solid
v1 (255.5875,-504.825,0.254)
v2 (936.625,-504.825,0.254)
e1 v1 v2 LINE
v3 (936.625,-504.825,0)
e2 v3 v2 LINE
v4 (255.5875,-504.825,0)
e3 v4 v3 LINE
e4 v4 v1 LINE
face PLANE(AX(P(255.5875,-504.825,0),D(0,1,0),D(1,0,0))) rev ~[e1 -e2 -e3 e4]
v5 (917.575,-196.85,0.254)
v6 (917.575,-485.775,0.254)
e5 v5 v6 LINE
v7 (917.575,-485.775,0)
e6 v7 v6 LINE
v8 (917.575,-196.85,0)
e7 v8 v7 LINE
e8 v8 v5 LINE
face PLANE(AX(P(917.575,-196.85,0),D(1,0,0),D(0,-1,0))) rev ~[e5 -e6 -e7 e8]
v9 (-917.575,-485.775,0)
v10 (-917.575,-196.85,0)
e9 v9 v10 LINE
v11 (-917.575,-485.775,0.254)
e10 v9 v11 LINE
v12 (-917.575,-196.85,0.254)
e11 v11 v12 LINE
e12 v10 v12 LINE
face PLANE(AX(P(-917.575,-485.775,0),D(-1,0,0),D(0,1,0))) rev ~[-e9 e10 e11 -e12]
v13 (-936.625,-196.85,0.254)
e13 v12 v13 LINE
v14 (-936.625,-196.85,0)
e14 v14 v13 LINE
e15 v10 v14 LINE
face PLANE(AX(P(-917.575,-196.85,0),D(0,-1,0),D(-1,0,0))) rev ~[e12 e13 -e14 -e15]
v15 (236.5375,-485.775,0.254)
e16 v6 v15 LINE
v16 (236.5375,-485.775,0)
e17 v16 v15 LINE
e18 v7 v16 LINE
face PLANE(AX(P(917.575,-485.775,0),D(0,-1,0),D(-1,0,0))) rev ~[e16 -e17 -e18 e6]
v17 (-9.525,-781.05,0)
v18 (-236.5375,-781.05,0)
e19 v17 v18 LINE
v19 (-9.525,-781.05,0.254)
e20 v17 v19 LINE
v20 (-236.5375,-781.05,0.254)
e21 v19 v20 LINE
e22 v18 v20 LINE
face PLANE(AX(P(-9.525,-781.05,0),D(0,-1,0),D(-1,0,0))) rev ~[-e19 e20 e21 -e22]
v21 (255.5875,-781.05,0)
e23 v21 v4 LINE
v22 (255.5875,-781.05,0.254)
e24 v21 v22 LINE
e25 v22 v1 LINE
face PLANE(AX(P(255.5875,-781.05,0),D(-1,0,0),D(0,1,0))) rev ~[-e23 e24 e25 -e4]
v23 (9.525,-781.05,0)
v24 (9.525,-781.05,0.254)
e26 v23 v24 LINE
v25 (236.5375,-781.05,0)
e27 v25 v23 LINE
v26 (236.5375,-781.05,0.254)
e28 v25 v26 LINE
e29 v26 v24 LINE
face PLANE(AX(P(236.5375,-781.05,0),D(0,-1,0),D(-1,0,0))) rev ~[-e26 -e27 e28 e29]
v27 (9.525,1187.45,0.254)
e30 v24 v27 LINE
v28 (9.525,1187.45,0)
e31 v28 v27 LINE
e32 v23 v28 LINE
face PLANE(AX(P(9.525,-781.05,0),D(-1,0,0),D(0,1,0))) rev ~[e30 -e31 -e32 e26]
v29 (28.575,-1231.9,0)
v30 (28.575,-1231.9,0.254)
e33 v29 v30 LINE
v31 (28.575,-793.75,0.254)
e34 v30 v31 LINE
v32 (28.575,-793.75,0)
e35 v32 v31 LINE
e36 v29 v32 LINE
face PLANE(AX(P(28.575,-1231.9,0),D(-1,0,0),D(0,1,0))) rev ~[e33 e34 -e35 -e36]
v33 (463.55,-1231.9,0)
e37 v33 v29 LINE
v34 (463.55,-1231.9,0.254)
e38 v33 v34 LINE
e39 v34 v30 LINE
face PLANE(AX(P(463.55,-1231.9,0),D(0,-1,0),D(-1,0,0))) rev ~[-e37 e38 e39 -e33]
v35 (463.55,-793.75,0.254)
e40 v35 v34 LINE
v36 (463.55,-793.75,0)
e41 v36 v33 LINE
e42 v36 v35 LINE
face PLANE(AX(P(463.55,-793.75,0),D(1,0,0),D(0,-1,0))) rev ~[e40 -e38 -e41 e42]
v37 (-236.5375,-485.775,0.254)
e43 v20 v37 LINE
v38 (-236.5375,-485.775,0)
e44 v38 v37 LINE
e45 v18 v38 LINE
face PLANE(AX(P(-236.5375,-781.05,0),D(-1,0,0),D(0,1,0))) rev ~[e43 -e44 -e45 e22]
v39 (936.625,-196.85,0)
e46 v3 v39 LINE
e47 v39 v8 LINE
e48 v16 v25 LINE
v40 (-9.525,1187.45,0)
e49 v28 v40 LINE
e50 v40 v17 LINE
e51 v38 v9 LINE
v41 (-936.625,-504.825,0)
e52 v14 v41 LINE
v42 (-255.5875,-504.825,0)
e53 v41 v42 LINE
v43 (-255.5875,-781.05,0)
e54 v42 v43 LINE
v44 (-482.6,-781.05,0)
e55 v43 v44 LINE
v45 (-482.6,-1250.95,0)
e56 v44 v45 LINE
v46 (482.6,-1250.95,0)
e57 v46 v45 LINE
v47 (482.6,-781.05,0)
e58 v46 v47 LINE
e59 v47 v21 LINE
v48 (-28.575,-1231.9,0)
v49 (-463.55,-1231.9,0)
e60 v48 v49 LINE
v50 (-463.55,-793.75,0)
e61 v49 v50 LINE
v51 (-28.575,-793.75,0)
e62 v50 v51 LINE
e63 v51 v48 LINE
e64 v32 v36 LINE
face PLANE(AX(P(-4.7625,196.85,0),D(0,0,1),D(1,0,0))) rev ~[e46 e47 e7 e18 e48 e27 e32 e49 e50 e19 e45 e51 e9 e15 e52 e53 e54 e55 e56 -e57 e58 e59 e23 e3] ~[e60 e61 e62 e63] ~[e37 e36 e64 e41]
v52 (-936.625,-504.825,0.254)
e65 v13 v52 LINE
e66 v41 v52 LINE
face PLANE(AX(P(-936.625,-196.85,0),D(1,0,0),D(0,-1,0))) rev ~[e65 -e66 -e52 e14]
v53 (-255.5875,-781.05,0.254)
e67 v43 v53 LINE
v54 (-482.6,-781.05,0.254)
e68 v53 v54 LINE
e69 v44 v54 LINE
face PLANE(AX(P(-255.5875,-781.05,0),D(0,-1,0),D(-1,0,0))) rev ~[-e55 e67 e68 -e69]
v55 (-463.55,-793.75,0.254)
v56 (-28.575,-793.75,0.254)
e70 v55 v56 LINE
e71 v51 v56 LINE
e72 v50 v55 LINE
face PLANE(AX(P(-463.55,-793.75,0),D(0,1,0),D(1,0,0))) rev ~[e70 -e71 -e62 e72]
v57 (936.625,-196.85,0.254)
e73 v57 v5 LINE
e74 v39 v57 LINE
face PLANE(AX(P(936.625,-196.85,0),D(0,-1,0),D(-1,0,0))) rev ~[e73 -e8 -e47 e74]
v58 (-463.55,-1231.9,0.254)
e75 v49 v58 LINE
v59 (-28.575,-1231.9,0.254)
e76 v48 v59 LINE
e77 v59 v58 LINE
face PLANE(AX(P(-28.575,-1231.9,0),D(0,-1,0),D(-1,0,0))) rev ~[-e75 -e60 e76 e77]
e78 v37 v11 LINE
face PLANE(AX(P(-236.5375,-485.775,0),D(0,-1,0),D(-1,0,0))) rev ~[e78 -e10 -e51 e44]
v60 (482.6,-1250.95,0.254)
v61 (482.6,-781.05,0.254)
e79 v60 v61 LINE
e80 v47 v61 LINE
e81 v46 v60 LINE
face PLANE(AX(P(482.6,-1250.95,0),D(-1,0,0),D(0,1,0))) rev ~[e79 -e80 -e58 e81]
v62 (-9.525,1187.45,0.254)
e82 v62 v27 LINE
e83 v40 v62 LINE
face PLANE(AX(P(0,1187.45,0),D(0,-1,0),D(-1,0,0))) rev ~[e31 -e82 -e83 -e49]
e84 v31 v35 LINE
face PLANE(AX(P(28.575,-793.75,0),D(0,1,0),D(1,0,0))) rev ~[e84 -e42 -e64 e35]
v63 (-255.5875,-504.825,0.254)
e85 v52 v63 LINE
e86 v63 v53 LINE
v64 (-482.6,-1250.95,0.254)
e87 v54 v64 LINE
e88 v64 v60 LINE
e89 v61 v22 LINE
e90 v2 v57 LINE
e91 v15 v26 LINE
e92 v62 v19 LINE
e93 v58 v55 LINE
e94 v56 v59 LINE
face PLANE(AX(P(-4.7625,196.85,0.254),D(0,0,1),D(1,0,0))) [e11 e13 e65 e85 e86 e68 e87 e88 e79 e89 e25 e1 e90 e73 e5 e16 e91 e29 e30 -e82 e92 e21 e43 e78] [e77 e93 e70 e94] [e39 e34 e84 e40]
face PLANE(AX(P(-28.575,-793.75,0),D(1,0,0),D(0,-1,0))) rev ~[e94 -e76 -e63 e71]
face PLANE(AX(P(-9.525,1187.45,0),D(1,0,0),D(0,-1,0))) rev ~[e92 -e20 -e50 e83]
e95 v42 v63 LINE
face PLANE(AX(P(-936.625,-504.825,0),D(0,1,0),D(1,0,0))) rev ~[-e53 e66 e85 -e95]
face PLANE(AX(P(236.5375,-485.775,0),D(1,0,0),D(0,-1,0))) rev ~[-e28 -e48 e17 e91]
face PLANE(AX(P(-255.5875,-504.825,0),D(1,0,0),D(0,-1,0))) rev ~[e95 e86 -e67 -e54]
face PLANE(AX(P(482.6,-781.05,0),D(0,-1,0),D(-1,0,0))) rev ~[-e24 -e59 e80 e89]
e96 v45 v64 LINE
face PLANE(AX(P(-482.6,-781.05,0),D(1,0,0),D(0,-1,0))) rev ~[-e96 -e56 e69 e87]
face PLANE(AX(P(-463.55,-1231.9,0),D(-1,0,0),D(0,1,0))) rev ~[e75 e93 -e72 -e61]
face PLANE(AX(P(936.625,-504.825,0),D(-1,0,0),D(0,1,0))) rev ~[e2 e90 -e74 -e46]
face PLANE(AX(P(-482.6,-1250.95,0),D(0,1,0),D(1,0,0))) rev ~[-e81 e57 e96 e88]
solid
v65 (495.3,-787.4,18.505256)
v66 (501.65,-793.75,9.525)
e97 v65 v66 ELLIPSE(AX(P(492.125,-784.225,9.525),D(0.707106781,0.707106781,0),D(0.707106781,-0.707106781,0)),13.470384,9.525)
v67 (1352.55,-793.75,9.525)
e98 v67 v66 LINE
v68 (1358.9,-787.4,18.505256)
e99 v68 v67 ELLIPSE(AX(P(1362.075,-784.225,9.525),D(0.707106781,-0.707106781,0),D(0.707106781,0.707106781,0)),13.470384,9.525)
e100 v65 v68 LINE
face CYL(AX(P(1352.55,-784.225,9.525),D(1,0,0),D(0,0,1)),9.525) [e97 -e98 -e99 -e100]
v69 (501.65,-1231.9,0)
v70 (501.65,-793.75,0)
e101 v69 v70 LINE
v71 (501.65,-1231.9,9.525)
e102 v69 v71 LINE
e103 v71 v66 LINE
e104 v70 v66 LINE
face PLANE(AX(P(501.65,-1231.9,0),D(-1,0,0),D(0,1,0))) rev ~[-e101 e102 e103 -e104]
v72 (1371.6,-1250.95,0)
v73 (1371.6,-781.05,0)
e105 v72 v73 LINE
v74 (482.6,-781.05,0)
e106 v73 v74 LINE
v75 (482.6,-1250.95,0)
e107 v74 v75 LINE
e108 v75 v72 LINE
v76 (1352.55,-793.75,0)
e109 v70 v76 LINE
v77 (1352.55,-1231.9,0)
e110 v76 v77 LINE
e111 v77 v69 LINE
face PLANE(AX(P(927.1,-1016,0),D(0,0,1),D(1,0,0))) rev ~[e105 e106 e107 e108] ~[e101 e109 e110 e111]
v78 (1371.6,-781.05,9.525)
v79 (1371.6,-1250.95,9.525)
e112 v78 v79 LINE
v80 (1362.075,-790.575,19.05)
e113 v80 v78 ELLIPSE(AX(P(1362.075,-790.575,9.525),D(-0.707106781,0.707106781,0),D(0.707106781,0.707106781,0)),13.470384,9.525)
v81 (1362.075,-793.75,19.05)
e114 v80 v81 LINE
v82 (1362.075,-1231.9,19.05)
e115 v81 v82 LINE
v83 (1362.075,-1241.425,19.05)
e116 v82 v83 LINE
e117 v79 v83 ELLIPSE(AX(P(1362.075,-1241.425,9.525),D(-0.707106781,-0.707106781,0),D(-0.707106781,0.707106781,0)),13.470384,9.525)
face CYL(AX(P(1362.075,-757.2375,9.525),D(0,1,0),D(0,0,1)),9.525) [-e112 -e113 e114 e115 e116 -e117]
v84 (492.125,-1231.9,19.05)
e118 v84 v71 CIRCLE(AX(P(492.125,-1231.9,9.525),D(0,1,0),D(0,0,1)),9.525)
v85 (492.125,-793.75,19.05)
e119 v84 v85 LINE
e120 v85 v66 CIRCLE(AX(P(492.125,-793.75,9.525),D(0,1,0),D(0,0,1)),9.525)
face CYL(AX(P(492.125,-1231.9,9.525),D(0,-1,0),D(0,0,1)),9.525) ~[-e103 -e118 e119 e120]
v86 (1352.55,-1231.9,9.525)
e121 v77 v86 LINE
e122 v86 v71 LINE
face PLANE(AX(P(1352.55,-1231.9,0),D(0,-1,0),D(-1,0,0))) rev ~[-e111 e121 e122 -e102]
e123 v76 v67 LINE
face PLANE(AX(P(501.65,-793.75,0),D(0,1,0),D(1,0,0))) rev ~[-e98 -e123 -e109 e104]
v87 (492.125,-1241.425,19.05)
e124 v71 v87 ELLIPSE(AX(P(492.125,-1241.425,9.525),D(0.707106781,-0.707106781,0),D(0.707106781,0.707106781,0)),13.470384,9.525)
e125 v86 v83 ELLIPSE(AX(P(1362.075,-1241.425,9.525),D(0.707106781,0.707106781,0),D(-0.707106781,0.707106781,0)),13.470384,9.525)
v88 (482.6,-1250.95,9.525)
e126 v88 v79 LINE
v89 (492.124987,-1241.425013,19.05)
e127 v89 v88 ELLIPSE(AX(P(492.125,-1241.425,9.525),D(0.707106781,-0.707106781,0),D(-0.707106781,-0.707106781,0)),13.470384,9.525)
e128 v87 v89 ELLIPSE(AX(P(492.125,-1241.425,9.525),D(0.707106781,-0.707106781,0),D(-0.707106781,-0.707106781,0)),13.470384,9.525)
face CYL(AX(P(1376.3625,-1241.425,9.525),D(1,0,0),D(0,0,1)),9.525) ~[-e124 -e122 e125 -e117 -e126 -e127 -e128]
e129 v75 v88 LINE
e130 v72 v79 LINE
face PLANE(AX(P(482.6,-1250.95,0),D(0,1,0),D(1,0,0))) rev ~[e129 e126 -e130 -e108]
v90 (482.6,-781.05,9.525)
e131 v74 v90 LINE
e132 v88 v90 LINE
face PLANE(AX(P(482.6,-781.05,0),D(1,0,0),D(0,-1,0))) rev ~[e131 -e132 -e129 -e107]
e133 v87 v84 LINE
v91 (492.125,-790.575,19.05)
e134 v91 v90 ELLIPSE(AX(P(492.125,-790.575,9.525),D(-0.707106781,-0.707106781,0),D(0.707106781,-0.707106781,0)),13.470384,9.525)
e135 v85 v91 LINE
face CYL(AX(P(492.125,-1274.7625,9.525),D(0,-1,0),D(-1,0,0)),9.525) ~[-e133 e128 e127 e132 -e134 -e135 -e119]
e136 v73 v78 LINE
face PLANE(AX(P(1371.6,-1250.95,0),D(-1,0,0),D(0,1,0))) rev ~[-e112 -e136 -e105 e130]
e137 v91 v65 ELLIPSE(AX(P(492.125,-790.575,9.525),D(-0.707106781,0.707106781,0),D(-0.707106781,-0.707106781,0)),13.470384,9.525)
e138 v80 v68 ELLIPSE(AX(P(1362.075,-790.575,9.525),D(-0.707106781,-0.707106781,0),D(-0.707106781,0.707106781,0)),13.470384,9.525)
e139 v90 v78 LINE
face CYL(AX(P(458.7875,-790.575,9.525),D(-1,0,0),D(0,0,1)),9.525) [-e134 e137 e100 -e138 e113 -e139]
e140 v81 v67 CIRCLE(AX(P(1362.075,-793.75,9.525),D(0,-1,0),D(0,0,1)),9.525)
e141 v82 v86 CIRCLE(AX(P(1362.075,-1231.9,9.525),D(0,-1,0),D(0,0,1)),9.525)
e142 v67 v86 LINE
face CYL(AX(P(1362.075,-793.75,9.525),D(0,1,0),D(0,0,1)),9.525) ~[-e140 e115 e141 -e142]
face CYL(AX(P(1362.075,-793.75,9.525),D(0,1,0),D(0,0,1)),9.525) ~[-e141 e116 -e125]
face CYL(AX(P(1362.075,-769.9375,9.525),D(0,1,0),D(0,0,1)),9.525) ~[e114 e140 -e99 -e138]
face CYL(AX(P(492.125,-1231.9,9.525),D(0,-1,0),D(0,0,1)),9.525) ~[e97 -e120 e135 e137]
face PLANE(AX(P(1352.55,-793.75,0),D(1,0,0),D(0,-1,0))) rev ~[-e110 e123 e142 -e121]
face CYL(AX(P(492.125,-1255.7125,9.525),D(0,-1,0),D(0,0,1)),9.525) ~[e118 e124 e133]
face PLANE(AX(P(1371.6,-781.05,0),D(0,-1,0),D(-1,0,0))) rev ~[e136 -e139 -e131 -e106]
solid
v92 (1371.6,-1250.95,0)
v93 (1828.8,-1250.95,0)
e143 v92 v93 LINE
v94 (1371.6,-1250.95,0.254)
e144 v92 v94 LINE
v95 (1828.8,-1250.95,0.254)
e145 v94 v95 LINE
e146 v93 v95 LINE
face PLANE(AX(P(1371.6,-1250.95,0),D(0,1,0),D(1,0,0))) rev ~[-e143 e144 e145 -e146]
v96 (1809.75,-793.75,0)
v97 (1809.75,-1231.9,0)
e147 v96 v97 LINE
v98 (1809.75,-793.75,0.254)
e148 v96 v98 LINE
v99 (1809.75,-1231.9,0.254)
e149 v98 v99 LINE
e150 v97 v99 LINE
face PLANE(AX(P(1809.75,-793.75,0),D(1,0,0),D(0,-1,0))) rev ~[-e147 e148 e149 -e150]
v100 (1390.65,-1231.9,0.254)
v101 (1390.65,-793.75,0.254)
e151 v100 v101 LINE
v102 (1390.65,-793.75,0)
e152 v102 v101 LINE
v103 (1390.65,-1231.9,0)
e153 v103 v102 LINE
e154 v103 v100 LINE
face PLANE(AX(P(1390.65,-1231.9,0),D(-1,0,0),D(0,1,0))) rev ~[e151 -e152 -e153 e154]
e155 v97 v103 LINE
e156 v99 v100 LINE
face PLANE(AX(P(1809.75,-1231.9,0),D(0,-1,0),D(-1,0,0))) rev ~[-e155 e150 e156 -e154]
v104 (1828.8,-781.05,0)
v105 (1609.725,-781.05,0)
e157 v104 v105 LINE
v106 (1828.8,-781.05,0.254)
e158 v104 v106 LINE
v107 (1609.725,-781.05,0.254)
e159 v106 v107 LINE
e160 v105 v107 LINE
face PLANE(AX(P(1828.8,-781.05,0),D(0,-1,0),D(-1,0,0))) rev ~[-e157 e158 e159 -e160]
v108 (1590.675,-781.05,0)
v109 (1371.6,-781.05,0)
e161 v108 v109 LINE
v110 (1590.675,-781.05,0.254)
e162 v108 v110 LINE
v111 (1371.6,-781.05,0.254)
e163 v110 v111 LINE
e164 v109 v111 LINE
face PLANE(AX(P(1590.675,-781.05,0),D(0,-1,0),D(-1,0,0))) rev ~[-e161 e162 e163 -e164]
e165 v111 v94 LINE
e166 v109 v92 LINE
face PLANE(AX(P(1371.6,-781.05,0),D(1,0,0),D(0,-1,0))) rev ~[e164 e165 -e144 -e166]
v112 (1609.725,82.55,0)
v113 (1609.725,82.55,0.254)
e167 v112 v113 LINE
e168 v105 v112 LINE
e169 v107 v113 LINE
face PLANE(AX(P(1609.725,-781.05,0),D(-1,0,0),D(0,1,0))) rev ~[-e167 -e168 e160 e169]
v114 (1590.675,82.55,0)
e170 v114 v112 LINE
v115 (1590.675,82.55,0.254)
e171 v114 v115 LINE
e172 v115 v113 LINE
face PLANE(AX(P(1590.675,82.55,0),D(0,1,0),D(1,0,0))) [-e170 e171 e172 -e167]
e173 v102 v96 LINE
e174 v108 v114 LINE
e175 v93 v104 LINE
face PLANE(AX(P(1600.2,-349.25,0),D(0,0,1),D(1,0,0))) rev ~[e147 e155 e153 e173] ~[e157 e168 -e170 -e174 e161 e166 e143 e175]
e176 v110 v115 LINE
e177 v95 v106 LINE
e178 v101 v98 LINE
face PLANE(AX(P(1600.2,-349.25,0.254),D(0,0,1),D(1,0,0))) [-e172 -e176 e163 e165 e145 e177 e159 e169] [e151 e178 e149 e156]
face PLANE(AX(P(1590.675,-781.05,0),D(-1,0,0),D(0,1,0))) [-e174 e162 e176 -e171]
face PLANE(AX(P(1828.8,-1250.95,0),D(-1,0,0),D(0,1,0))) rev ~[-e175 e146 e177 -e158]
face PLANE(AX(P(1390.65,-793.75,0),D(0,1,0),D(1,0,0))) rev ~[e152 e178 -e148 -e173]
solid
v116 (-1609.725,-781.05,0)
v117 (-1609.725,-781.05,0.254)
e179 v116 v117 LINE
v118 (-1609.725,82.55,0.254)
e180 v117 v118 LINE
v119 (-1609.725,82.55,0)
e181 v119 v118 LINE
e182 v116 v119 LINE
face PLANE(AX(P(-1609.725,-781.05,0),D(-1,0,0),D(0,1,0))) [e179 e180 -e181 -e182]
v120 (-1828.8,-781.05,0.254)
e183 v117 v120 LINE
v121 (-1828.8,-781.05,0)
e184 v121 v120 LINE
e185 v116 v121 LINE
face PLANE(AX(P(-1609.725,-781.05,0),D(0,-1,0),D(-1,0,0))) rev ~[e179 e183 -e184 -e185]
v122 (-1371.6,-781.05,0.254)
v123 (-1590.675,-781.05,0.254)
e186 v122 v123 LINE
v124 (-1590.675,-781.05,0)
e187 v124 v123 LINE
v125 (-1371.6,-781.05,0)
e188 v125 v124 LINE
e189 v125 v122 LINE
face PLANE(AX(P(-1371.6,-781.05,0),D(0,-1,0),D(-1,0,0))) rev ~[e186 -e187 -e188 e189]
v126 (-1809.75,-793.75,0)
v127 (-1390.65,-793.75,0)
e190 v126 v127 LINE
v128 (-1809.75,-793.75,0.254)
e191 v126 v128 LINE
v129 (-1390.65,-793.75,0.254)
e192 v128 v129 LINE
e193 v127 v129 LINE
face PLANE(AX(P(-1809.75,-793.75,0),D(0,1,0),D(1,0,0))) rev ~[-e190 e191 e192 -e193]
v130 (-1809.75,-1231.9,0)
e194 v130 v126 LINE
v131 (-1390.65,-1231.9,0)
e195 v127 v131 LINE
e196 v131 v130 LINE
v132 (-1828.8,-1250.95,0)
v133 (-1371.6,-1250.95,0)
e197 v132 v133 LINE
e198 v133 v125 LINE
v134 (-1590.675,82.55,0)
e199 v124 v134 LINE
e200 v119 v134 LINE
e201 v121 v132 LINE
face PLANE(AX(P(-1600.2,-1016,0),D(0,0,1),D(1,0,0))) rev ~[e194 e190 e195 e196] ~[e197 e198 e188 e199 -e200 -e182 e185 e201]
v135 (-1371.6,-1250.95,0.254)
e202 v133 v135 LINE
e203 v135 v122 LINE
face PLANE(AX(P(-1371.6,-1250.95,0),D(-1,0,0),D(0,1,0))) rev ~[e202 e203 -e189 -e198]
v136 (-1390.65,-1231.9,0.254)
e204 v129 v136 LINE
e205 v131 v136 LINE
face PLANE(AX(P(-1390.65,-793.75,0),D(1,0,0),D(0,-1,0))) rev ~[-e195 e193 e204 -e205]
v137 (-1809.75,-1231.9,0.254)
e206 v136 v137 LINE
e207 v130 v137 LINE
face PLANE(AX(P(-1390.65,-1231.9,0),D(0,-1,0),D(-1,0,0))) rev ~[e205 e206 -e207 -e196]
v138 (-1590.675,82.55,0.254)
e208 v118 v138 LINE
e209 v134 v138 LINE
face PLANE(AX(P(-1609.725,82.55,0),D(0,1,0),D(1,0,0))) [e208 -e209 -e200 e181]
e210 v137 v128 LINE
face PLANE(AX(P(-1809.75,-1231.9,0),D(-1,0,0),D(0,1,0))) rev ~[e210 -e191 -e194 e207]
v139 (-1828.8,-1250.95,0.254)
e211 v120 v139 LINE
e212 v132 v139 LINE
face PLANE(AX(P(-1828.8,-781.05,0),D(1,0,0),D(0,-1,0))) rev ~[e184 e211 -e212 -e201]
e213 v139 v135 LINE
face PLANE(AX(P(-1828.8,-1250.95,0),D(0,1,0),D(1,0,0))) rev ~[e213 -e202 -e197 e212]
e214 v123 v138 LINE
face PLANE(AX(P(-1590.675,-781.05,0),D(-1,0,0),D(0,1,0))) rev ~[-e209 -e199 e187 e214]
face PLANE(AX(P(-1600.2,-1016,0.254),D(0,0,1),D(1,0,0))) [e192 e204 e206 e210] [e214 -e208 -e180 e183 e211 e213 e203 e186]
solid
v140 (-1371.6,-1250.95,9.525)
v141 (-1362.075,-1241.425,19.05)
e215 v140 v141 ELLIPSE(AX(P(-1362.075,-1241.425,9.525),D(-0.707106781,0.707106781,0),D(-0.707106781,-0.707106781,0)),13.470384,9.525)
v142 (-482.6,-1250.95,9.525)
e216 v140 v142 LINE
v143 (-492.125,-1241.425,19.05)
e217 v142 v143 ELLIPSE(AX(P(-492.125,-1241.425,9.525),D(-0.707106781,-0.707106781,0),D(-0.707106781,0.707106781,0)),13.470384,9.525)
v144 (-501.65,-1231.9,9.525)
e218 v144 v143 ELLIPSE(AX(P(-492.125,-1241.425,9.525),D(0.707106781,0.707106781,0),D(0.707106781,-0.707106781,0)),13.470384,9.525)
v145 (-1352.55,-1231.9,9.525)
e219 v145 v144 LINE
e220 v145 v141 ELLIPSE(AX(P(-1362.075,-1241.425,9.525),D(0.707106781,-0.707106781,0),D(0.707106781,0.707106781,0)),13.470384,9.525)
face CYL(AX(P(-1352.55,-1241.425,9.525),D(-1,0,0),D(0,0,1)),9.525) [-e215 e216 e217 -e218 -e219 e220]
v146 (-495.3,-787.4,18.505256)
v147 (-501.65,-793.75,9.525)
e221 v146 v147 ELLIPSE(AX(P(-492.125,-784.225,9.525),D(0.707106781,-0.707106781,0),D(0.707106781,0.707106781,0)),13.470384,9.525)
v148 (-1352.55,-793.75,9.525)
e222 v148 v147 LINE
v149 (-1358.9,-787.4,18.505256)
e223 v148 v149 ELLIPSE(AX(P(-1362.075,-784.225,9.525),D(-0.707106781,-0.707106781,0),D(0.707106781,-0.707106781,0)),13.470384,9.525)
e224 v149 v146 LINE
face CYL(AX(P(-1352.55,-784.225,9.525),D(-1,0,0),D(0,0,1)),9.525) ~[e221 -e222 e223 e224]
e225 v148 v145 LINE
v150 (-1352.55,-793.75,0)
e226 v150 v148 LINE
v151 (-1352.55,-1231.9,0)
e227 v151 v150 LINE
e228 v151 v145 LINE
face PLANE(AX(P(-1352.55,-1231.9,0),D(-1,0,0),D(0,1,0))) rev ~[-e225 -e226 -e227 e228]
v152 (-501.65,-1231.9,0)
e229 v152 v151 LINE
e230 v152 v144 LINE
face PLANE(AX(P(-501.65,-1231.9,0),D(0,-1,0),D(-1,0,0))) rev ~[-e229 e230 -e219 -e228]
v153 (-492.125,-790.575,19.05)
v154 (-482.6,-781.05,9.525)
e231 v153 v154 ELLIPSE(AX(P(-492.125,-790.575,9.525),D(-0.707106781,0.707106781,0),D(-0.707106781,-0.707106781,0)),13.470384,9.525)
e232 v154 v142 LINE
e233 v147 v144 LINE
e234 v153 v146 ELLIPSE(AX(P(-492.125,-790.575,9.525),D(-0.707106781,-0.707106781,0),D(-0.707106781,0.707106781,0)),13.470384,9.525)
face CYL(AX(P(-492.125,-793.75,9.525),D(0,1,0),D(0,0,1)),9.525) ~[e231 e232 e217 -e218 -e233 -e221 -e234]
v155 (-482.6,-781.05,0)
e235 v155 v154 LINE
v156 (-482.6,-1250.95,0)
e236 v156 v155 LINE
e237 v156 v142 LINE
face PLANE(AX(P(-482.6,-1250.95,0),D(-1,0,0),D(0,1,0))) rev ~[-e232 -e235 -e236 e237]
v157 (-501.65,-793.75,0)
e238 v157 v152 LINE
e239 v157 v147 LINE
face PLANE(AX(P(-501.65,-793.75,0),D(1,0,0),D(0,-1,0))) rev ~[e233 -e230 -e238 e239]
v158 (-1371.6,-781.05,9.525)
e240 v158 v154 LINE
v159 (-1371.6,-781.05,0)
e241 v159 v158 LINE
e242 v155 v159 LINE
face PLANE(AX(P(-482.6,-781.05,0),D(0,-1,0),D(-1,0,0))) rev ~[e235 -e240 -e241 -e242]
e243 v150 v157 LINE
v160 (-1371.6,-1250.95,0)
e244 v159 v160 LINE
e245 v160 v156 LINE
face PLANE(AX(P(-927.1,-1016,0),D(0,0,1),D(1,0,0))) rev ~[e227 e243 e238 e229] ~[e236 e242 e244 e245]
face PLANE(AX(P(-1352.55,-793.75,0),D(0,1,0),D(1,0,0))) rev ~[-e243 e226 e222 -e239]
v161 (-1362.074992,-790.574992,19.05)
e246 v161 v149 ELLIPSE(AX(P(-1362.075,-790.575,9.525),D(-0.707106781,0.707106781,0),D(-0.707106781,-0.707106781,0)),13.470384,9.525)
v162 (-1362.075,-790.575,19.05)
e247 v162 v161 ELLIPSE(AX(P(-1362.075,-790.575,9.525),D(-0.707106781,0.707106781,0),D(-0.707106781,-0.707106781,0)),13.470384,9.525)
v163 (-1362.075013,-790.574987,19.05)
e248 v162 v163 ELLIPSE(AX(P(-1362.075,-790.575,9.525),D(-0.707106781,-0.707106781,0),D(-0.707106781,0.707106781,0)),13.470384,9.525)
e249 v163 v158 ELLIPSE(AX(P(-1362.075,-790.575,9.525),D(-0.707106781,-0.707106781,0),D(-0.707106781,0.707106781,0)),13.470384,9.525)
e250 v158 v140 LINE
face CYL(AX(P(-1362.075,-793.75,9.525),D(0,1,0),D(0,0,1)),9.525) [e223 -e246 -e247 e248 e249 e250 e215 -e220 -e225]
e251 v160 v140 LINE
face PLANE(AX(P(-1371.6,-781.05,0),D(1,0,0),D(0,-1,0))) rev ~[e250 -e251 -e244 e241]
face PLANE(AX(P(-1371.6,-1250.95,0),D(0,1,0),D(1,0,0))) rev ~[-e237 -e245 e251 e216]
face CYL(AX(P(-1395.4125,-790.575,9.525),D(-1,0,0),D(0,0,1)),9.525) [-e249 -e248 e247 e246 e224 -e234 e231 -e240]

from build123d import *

# Parameters (mm, degrees)
F0_W         = 9.525
F0_H         = 457.2
F1_DEPTH     = 0.254
F0_W_2       = 19.05
F0_H_2       = 863.6
F2_DEPTH     = 19.05
F3_T1_DEPTH  = 936.625
F3_T3_DEPTH  = 517.525
F3_T5_DEPTH  = 850.9
F3_T7_DEPTH  = 438.15
F3_T13_DEPTH = 874.7125
F3_T17_DEPTH = 461.9625
F3_T24_DEPTH = 874.7125
F3_T28_DEPTH = 461.9625
F3_T35_DEPTH = 461.9625
F3_T39_DEPTH = 874.7125
F3_T46_DEPTH = 874.7125
F3_T50_DEPTH = 461.9625
F4_DEPTH     = 0.254
F5_DEPTH     = 19.05
F6_T3_DEPTH  = 517.525
F6_T6_DEPTH  = 936.625
F6_T9_DEPTH  = 517.525
F6_T12_DEPTH = 936.625
F6_T15_DEPTH = 850.9
F6_T18_DEPTH = 438.15
F6_T21_DEPTH = 850.9
F6_T24_DEPTH = 438.15
F6_T28_DEPTH = 874.7125
F6_T32_DEPTH = 461.9625
F6_T38_DEPTH = 874.7125
F6_T42_DEPTH = 461.9625
F6_T48_DEPTH = 461.9625
F6_T52_DEPTH = 874.7125
F6_T58_DEPTH = 874.7125
F6_T62_DEPTH = 461.9625


# Not quite as in the source:
# - a fillet or chamfer that OpenCascade refuses, or shapes differently, is made with other operations: its cross-section is extruded or revolved along the edge and cut away or added
# - a feature names something its author has since deleted; it is built from what else it names


with BuildPart() as f1:
    # F0 (on Top) → F1 (new body)
    with BuildSketch(Plane.XY):
        Polygon((0, -793.75), (0, 1187.45), (-9.525, 1187.45), (-9.525, -781.05), (-9.525, -793.75), align=None)
        with Locations((-4.7625, -1022.35)):
            Rectangle(F0_W, F0_H)
        Polygon((-9.525, -793.75), (-9.525, -781.05), (-28.575, -781.05), (-236.5375, -781.05), (-255.5875, -781.05), (-463.55, -781.05), (-482.6, -781.05), (-482.6, -793.75), (-482.6, -1250.95), (-9.525, -1250.95), align=None)
        Polygon((-28.575, -1231.9), (-463.55, -1231.9), (-463.55, -793.75), (-255.5875, -793.75), (-236.5375, -793.75), (-28.575, -793.75), align=None, mode=Mode.SUBTRACT)
        Polygon((-255.5875, -781.05), (-236.5375, -781.05), (-236.5375, -485.775), (-917.575, -485.775), (-917.575, -196.85), (-936.625, -196.85), (-936.625, -504.825), (-936.3493996177, -504.825), (-917.575, -504.825), (-255.5875, -504.825), align=None)
    extrude(amount=F1_DEPTH)

    # F0 (on Top) → F4 (join)
    with BuildSketch(Plane.XY):
        Polygon((9.525, -781.05), (9.525, -793.75), (9.525, -1250.95), (482.6, -1250.95), (482.6, -793.75), (482.6, -781.05), (463.55, -781.05), (255.5875, -781.05), (236.5375, -781.05), (28.575, -781.05), align=None)
        Polygon((28.575, -793.75), (236.5375, -793.75), (255.5875, -793.75), (463.55, -793.75), (463.55, -1231.9), (28.575, -1231.9), align=None, mode=Mode.SUBTRACT)
        with Locations((4.7625, -1022.35)):
            Rectangle(F0_W, F0_H)
        with Locations((-4.7625, -1022.35)):
            Rectangle(F0_W, F0_H)
        Polygon((0, -793.75), (0, 1187.45), (-9.525, 1187.45), (-9.525, -781.05), (-9.525, -793.75), align=None)
        Polygon((9.525, 1187.45), (0, 1187.45), (0, -793.75), (9.525, -793.75), (9.525, -781.05), align=None)
        Polygon((236.5375, -485.775), (236.5375, -781.05), (255.5875, -781.05), (255.5875, -504.825), (917.575, -504.825), (936.3493996177, -504.825), (936.625, -504.825), (936.625, -196.85), (917.575, -196.85), (917.575, -485.775), align=None)
    extrude(amount=F4_DEPTH)


with BuildPart() as f1b:
    # F0 (on Top) → F1, piece 2 (new body)
    with BuildSketch(Plane.XY):
        Polygon((-1809.75, -781.05), (-1828.8, -781.05), (-1828.8, -1250.95), (-1371.6, -1250.95), (-1371.6, -793.75), (-1371.6, -781.05), (-1390.65, -781.05), (-1590.675, -781.05), (-1609.725, -781.05), align=None)
        Polygon((-1809.75, -1231.9), (-1809.75, -793.75), (-1609.725, -793.75), (-1590.675, -793.75), (-1390.65, -793.75), (-1390.65, -1231.9), align=None, mode=Mode.SUBTRACT)
        with Locations((-1600.2, -349.25)):
            Rectangle(F0_W_2, F0_H_2)
    extrude(amount=F1_DEPTH)


with BuildPart() as f2:
    # F0 (on Top) → F2 (new body)
    with BuildSketch(Plane.XY):
        Polygon((-1371.6, -1250.95), (-482.6, -1250.95), (-482.6, -793.75), (-482.6, -781.05), (-501.65, -781.05), (-1352.55, -781.05), (-1371.6, -781.05), (-1371.6, -793.75), align=None)
        Polygon((-501.65, -1231.9), (-1352.55, -1231.9), (-1352.55, -793.75), (-927.1, -793.75), (-501.65, -793.75), align=None, mode=Mode.SUBTRACT)
    extrude(amount=F2_DEPTH)

    # F3: fillet of radius 9.525 on 8 edges, made by hand

    # F3_s2 → F3_t1 (cut)
    with BuildSketch(Plane.YZ.offset(-1395.4125)):
        with BuildLine():
            ThreePointArc((-1250.95, 9.525), (-1248.1601920908, 16.2601920908), (-1241.425, 19.05))
            Line((-1241.425, 19.05), (-1250.95, 19.05))
            Line((-1250.95, 19.05), (-1250.95, 9.525))
        make_face()
        with BuildLine():
            ThreePointArc((-790.575, 19.05), (-783.8398079092, 16.2601920908), (-781.05, 9.525))
            Line((-781.05, 9.525), (-781.05, 19.05))
            Line((-781.05, 19.05), (-790.575, 19.05))
        make_face()
    extrude(amount=F3_T1_DEPTH, mode=Mode.SUBTRACT)

    # F3_s4 → F3_t3 (cut)
    with BuildSketch(Plane.XZ.offset(757.2375)):
        with BuildLine():
            ThreePointArc((-492.125, 19.05), (-485.3898079092, 16.2601920908), (-482.6, 9.525))
            Line((-482.6, 9.525), (-482.6, 19.05))
            Line((-482.6, 19.05), (-492.125, 19.05))
        make_face()
        with BuildLine():
            ThreePointArc((-1362.075, 19.05), (-1368.8101920908, 16.2601920908), (-1371.6, 9.525))
            Line((-1371.6, 9.525), (-1371.6, 19.05))
            Line((-1371.6, 19.05), (-1362.075, 19.05))
        make_face()
    extrude(amount=F3_T3_DEPTH, mode=Mode.SUBTRACT)

    # F3_s6 → F3_t5 (cut)
    with BuildSketch(Plane.YZ.offset(-1352.55)):
        with BuildLine():
            ThreePointArc((-1241.425, 19.05), (-1234.6898079092, 16.2601920908), (-1231.9, 9.525))
            Line((-1231.9, 9.525), (-1231.9, 19.05))
            Line((-1231.9, 19.05), (-1241.425, 19.05))
        make_face()
        with BuildLine():
            ThreePointArc((-784.225, 19.05), (-790.9601920908, 16.2601920908), (-793.75, 9.525))
            Line((-793.75, 9.525), (-793.75, 19.05))
            Line((-793.75, 19.05), (-784.225, 19.05))
        make_face()
    extrude(amount=F3_T5_DEPTH, mode=Mode.SUBTRACT)

    # F3_s8 → F3_t7 (cut)
    with BuildSketch(Plane.XZ.offset(793.75)):
        with BuildLine():
            ThreePointArc((-1362.075, 19.05), (-1355.3398079092, 16.2601920908), (-1352.55, 9.525))
            Line((-1352.55, 9.525), (-1352.55, 19.05))
            Line((-1352.55, 19.05), (-1362.075, 19.05))
        make_face()
        with BuildLine():
            ThreePointArc((-492.125, 19.05), (-498.8601920908, 16.2601920908), (-501.65, 9.525))
            Line((-501.65, 9.525), (-501.65, 19.05))
            Line((-501.65, 19.05), (-492.125, 19.05))
        make_face()
    extrude(amount=F3_T7_DEPTH, mode=Mode.SUBTRACT)


with BuildPart() as f3_tool11:
    # F3_s12 → F3_t13 (new body)
    with BuildSketch(Plane.YZ.offset(-477.8375)):
        with BuildLine():
            ThreePointArc((-1241.425, 19.05), (-1234.6898079092, 16.2601920908), (-1231.9, 9.525))
            Line((-1231.9, 9.525), (-1231.9, 19.05))
            Line((-1231.9, 19.05), (-1241.425, 19.05))
        make_face()
    extrude(amount=-F3_T13_DEPTH)

    split(bisect_by=Plane.YZ.offset(-501.65), keep=Keep.TOP)


with BuildPart() as f3_tool15:
    # F3_s16 → F3_t17 (new body)
    with BuildSketch(Plane.XZ.offset(793.75)):
        with BuildLine():
            ThreePointArc((-492.125, 19.05), (-498.8601920908, 16.2601920908), (-501.65, 9.525))
            Line((-501.65, 9.525), (-501.65, 19.05))
            Line((-501.65, 19.05), (-492.125, 19.05))
        make_face()
    extrude(amount=F3_T17_DEPTH)

    split(bisect_by=Plane.XZ.offset(1231.9), keep=Keep.TOP)


with BuildPart() as f3_tool11_1:
    add(f3_tool11.part)

    # F3_t19: intersect F3_tool15
    add(f3_tool15.part, mode=Mode.INTERSECT)


with BuildPart() as f2_1:
    add(f2.part)

    # F3_t9: cut F3_tool11
    add(f3_tool11_1.part, mode=Mode.SUBTRACT)


with BuildPart() as f3_tool22:
    # F3_s23 → F3_t24 (new body)
    with BuildSketch(Plane.YZ.offset(-501.65)):
        with BuildLine():
            ThreePointArc((-1241.425, 19.05), (-1234.6898079092, 16.2601920908), (-1231.9, 9.525))
            Line((-1231.9, 9.525), (-1231.9, 19.05))
            Line((-1231.9, 19.05), (-1241.425, 19.05))
        make_face()
    extrude(amount=-F3_T24_DEPTH)

    split(bisect_by=Plane.YZ.offset(-1352.55), keep=Keep.BOTTOM)


with BuildPart() as f3_tool26:
    # F3_s27 → F3_t28 (new body)
    with BuildSketch(Plane.XZ.offset(1255.7125)):
        with BuildLine():
            ThreePointArc((-1362.075, 19.05), (-1355.3398079092, 16.2601920908), (-1352.55, 9.525))
            Line((-1352.55, 9.525), (-1352.55, 19.05))
            Line((-1352.55, 19.05), (-1362.075, 19.05))
        make_face()
    extrude(amount=-F3_T28_DEPTH)

    split(bisect_by=Plane.XZ.offset(1231.9), keep=Keep.TOP)


with BuildPart() as f3_tool22_1:
    add(f3_tool22.part)

    # F3_t30: intersect F3_tool26
    add(f3_tool26.part, mode=Mode.INTERSECT)


with BuildPart() as f2_2:
    add(f2_1.part)

    # F3_t20: cut F3_tool22
    add(f3_tool22_1.part, mode=Mode.SUBTRACT)


with BuildPart() as f3_tool33:
    # F3_s34 → F3_t35 (new body)
    with BuildSketch(Plane.XZ.offset(1231.9)):
        with BuildLine():
            ThreePointArc((-1362.075, 19.05), (-1355.3398079092, 16.2601920908), (-1352.55, 9.525))
            Line((-1352.55, 9.525), (-1352.55, 19.05))
            Line((-1352.55, 19.05), (-1362.075, 19.05))
        make_face()
    extrude(amount=-F3_T35_DEPTH)

    split(bisect_by=Plane.XZ.offset(793.75), keep=Keep.BOTTOM)


with BuildPart() as f3_tool37:
    # F3_s38 → F3_t39 (new body)
    with BuildSketch(Plane.YZ.offset(-501.65)):
        with BuildLine():
            ThreePointArc((-784.225, 19.05), (-790.9601920908, 16.2601920908), (-793.75, 9.525))
            Line((-793.75, 9.525), (-793.75, 19.05))
            Line((-793.75, 19.05), (-784.225, 19.05))
        make_face()
    extrude(amount=-F3_T39_DEPTH)

    split(bisect_by=Plane.YZ.offset(-1352.55), keep=Keep.BOTTOM)


with BuildPart() as f3_tool33_1:
    add(f3_tool33.part)

    # F3_t41: intersect F3_tool37
    add(f3_tool37.part, mode=Mode.INTERSECT)


with BuildPart() as f2_3:
    add(f2_2.part)

    # F3_t31: cut F3_tool33
    add(f3_tool33_1.part, mode=Mode.SUBTRACT)


with BuildPart() as f3_tool44:
    # F3_s45 → F3_t46 (new body)
    with BuildSketch(Plane.YZ.offset(-477.8375)):
        with BuildLine():
            ThreePointArc((-784.225, 19.05), (-790.9601920908, 16.2601920908), (-793.75, 9.525))
            Line((-793.75, 9.525), (-793.75, 19.05))
            Line((-793.75, 19.05), (-784.225, 19.05))
        make_face()
    extrude(amount=-F3_T46_DEPTH)

    split(bisect_by=Plane.YZ.offset(-501.65), keep=Keep.TOP)


with BuildPart() as f3_tool48:
    # F3_s49 → F3_t50 (new body)
    with BuildSketch(Plane.XZ.offset(769.9375)):
        with BuildLine():
            ThreePointArc((-492.125, 19.05), (-498.8601920908, 16.2601920908), (-501.65, 9.525))
            Line((-501.65, 9.525), (-501.65, 19.05))
            Line((-501.65, 19.05), (-492.125, 19.05))
        make_face()
    extrude(amount=F3_T50_DEPTH)

    split(bisect_by=Plane.XZ.offset(793.75), keep=Keep.BOTTOM)


with BuildPart() as f3_tool44_1:
    add(f3_tool44.part)

    # F3_t52: intersect F3_tool48
    add(f3_tool48.part, mode=Mode.INTERSECT)


with BuildPart() as f2_4:
    add(f2_3.part)

    # F3_t42: cut F3_tool44
    add(f3_tool44_1.part, mode=Mode.SUBTRACT)


with BuildPart() as f4:
    # F0 (on Top) → F4, piece 2 (new body)
    with BuildSketch(Plane.XY):
        with Locations((1600.2, -349.25)):
            Rectangle(F0_W_2, F0_H_2)
        Polygon((1828.8, -1250.95), (1828.8, -781.05), (1809.75, -781.05), (1609.725, -781.05), (1590.675, -781.05), (1390.65, -781.05), (1371.6, -781.05), (1371.6, -793.75), (1371.6, -1250.95), align=None)
        Polygon((1590.675, -793.75), (1609.725, -793.75), (1809.75, -793.75), (1809.75, -1231.9), (1390.65, -1231.9), (1390.65, -793.75), align=None, mode=Mode.SUBTRACT)
    extrude(amount=F4_DEPTH)


with BuildPart() as f5:
    # F0 (on Top) → F5 (new body)
    with BuildSketch(Plane.XY):
        Polygon((482.6, -793.75), (482.6, -1250.95), (1371.6, -1250.95), (1371.6, -793.75), (1371.6, -781.05), (1352.55, -781.05), (501.65, -781.05), (482.6, -781.05), align=None)
        Polygon((927.1, -793.75), (1352.55, -793.75), (1352.55, -1231.9), (501.65, -1231.9), (501.65, -793.75), align=None, mode=Mode.SUBTRACT)
    extrude(amount=F5_DEPTH)

    # F6: fillet of radius 9.525 on 8 edges, made by hand


with BuildPart() as f6_tool1:
    # F6_s2 → F6_t3 (new body)
    with BuildSketch(Plane.XZ.offset(1274.7625)):
        with BuildLine():
            ThreePointArc((482.6, 9.525), (485.3898079092, 16.2601920908), (492.125, 19.05))
            Line((492.125, 19.05), (482.6, 19.05))
            Line((482.6, 19.05), (482.6, 9.525))
        make_face()
    extrude(amount=-F6_T3_DEPTH)


with BuildPart() as f6_tool4:
    # F6_s5 → F6_t6 (new body)
    with BuildSketch(Plane.YZ.offset(458.7875)):
        with BuildLine():
            ThreePointArc((-1241.425, 19.05), (-1248.1601920908, 16.2601920908), (-1250.95, 9.525))
            Line((-1250.95, 9.525), (-1250.95, 19.05))
            Line((-1250.95, 19.05), (-1241.425, 19.05))
        make_face()
    extrude(amount=F6_T6_DEPTH)


with BuildPart() as f6_tool7:
    # F6_s8 → F6_t9 (new body)
    with BuildSketch(Plane.XZ.offset(757.2375)):
        with BuildLine():
            ThreePointArc((1362.075, 19.05), (1368.8101920908, 16.2601920908), (1371.6, 9.525))
            Line((1371.6, 9.525), (1371.6, 19.05))
            Line((1371.6, 19.05), (1362.075, 19.05))
        make_face()
    extrude(amount=F6_T9_DEPTH)


with BuildPart() as f6_tool10:
    # F6_s11 → F6_t12 (new body)
    with BuildSketch(Plane.YZ.offset(458.7875)):
        with BuildLine():
            ThreePointArc((-790.575, 19.05), (-783.8398079092, 16.2601920908), (-781.05, 9.525))
            Line((-781.05, 9.525), (-781.05, 19.05))
            Line((-781.05, 19.05), (-790.575, 19.05))
        make_face()
    extrude(amount=F6_T12_DEPTH)


with BuildPart() as f6_tool13:
    # F6_s14 → F6_t15 (new body)
    with BuildSketch(Plane.YZ.offset(1352.55)):
        with BuildLine():
            ThreePointArc((-784.225, 19.05), (-790.9601920908, 16.2601920908), (-793.75, 9.525))
            Line((-793.75, 9.525), (-793.75, 19.05))
            Line((-793.75, 19.05), (-784.225, 19.05))
        make_face()
    extrude(amount=-F6_T15_DEPTH)


with BuildPart() as f6_tool16:
    # F6_s17 → F6_t18 (new body)
    with BuildSketch(Plane.XZ.offset(793.75)):
        with BuildLine():
            ThreePointArc((1362.075, 19.05), (1355.3398079092, 16.2601920908), (1352.55, 9.525))
            Line((1352.55, 9.525), (1352.55, 19.05))
            Line((1352.55, 19.05), (1362.075, 19.05))
        make_face()
    extrude(amount=F6_T18_DEPTH)


with BuildPart() as f6_tool19:
    # F6_s20 → F6_t21 (new body)
    with BuildSketch(Plane.YZ.offset(1352.55)):
        with BuildLine():
            ThreePointArc((-1241.425, 19.05), (-1234.6898079092, 16.2601920908), (-1231.9, 9.525))
            Line((-1231.9, 9.525), (-1231.9, 19.05))
            Line((-1231.9, 19.05), (-1241.425, 19.05))
        make_face()
    extrude(amount=-F6_T21_DEPTH)


with BuildPart() as f6_tool22:
    # F6_s23 → F6_t24 (new body)
    with BuildSketch(Plane.XZ.offset(1231.9)):
        with BuildLine():
            ThreePointArc((492.125, 19.05), (498.8601920908, 16.2601920908), (501.65, 9.525))
            Line((501.65, 9.525), (501.65, 19.05))
            Line((501.65, 19.05), (492.125, 19.05))
        make_face()
    extrude(amount=-F6_T24_DEPTH)


with BuildPart() as f6_tool26:
    # F6_s27 → F6_t28 (new body)
    with BuildSketch(Plane.YZ.offset(1376.3625)):
        with BuildLine():
            ThreePointArc((-784.225, 19.05), (-790.9601920908, 16.2601920908), (-793.75, 9.525))
            Line((-793.75, 9.525), (-793.75, 19.05))
            Line((-793.75, 19.05), (-784.225, 19.05))
        make_face()
    extrude(amount=-F6_T28_DEPTH)

    split(bisect_by=Plane.YZ.offset(1352.55), keep=Keep.TOP)


with BuildPart() as f6_tool30:
    # F6_s31 → F6_t32 (new body)
    with BuildSketch(Plane.XZ.offset(769.9375)):
        with BuildLine():
            ThreePointArc((1362.075, 19.05), (1355.3398079092, 16.2601920908), (1352.55, 9.525))
            Line((1352.55, 9.525), (1352.55, 19.05))
            Line((1352.55, 19.05), (1362.075, 19.05))
        make_face()
    extrude(amount=F6_T32_DEPTH)

    split(bisect_by=Plane.XZ.offset(793.75), keep=Keep.BOTTOM)


with BuildPart() as f6_tool26_1:
    add(f6_tool26.part)

    # F6_t34: intersect F6_tool30
    add(f6_tool30.part, mode=Mode.INTERSECT)


with BuildPart() as f6_tool36:
    # F6_s37 → F6_t38 (new body)
    with BuildSketch(Plane.YZ.offset(1352.55)):
        with BuildLine():
            ThreePointArc((-784.225, 19.05), (-790.9601920908, 16.2601920908), (-793.75, 9.525))
            Line((-793.75, 9.525), (-793.75, 19.05))
            Line((-793.75, 19.05), (-784.225, 19.05))
        make_face()
    extrude(amount=-F6_T38_DEPTH)

    split(bisect_by=Plane.YZ.offset(501.65), keep=Keep.BOTTOM)


with BuildPart() as f6_tool40:
    # F6_s41 → F6_t42 (new body)
    with BuildSketch(Plane.XZ.offset(1231.9)):
        with BuildLine():
            ThreePointArc((492.125, 19.05), (498.8601920908, 16.2601920908), (501.65, 9.525))
            Line((501.65, 9.525), (501.65, 19.05))
            Line((501.65, 19.05), (492.125, 19.05))
        make_face()
    extrude(amount=-F6_T42_DEPTH)

    split(bisect_by=Plane.XZ.offset(793.75), keep=Keep.BOTTOM)


with BuildPart() as f6_tool36_1:
    add(f6_tool36.part)

    # F6_t44: intersect F6_tool40
    add(f6_tool40.part, mode=Mode.INTERSECT)


with BuildPart() as f6_tool46:
    # F6_s47 → F6_t48 (new body)
    with BuildSketch(Plane.XZ.offset(793.75)):
        with BuildLine():
            ThreePointArc((1362.075, 19.05), (1355.3398079092, 16.2601920908), (1352.55, 9.525))
            Line((1352.55, 9.525), (1352.55, 19.05))
            Line((1352.55, 19.05), (1362.075, 19.05))
        make_face()
    extrude(amount=F6_T48_DEPTH)

    split(bisect_by=Plane.XZ.offset(1231.9), keep=Keep.TOP)


with BuildPart() as f6_tool50:
    # F6_s51 → F6_t52 (new body)
    with BuildSketch(Plane.YZ.offset(1376.3625)):
        with BuildLine():
            ThreePointArc((-1241.425, 19.05), (-1234.6898079092, 16.2601920908), (-1231.9, 9.525))
            Line((-1231.9, 9.525), (-1231.9, 19.05))
            Line((-1231.9, 19.05), (-1241.425, 19.05))
        make_face()
    extrude(amount=-F6_T52_DEPTH)

    split(bisect_by=Plane.YZ.offset(1352.55), keep=Keep.TOP)


with BuildPart() as f6_tool46_1:
    add(f6_tool46.part)

    # F6_t54: intersect F6_tool50
    add(f6_tool50.part, mode=Mode.INTERSECT)


with BuildPart() as f6_tool56:
    # F6_s57 → F6_t58 (new body)
    with BuildSketch(Plane.YZ.offset(1352.55)):
        with BuildLine():
            ThreePointArc((-1241.425, 19.05), (-1234.6898079092, 16.2601920908), (-1231.9, 9.525))
            Line((-1231.9, 9.525), (-1231.9, 19.05))
            Line((-1231.9, 19.05), (-1241.425, 19.05))
        make_face()
    extrude(amount=-F6_T58_DEPTH)

    split(bisect_by=Plane.YZ.offset(501.65), keep=Keep.BOTTOM)


with BuildPart() as f6_tool60:
    # F6_s61 → F6_t62 (new body)
    with BuildSketch(Plane.XZ.offset(1255.7125)):
        with BuildLine():
            ThreePointArc((492.125, 19.05), (498.8601920908, 16.2601920908), (501.65, 9.525))
            Line((501.65, 9.525), (501.65, 19.05))
            Line((501.65, 19.05), (492.125, 19.05))
        make_face()
    extrude(amount=-F6_T62_DEPTH)

    split(bisect_by=Plane.XZ.offset(1231.9), keep=Keep.TOP)


with BuildPart() as f6_tool56_1:
    add(f6_tool56.part)

    # F6_t64: intersect F6_tool60
    add(f6_tool60.part, mode=Mode.INTERSECT)


with BuildPart() as f5_1:
    add(f5.part)

    # F6_t65: cut F6_tool1, F6_tool4, F6_tool7, F6_tool10, F6_tool13, F6_tool16, F6_tool19, F6_tool22, F6_tool26, F6_tool36, F6_tool46, F6_tool56
    add([f6_tool1.part, f6_tool4.part, f6_tool7.part, f6_tool10.part, f6_tool13.part, f6_tool16.part, f6_tool19.part, f6_tool22.part, f6_tool26_1.part, f6_tool36_1.part, f6_tool46_1.part, f6_tool56_1.part], mode=Mode.SUBTRACT)


solid = Compound([f1.part, f1b.part, f2_4.part, f4.part, f5_1.part])
